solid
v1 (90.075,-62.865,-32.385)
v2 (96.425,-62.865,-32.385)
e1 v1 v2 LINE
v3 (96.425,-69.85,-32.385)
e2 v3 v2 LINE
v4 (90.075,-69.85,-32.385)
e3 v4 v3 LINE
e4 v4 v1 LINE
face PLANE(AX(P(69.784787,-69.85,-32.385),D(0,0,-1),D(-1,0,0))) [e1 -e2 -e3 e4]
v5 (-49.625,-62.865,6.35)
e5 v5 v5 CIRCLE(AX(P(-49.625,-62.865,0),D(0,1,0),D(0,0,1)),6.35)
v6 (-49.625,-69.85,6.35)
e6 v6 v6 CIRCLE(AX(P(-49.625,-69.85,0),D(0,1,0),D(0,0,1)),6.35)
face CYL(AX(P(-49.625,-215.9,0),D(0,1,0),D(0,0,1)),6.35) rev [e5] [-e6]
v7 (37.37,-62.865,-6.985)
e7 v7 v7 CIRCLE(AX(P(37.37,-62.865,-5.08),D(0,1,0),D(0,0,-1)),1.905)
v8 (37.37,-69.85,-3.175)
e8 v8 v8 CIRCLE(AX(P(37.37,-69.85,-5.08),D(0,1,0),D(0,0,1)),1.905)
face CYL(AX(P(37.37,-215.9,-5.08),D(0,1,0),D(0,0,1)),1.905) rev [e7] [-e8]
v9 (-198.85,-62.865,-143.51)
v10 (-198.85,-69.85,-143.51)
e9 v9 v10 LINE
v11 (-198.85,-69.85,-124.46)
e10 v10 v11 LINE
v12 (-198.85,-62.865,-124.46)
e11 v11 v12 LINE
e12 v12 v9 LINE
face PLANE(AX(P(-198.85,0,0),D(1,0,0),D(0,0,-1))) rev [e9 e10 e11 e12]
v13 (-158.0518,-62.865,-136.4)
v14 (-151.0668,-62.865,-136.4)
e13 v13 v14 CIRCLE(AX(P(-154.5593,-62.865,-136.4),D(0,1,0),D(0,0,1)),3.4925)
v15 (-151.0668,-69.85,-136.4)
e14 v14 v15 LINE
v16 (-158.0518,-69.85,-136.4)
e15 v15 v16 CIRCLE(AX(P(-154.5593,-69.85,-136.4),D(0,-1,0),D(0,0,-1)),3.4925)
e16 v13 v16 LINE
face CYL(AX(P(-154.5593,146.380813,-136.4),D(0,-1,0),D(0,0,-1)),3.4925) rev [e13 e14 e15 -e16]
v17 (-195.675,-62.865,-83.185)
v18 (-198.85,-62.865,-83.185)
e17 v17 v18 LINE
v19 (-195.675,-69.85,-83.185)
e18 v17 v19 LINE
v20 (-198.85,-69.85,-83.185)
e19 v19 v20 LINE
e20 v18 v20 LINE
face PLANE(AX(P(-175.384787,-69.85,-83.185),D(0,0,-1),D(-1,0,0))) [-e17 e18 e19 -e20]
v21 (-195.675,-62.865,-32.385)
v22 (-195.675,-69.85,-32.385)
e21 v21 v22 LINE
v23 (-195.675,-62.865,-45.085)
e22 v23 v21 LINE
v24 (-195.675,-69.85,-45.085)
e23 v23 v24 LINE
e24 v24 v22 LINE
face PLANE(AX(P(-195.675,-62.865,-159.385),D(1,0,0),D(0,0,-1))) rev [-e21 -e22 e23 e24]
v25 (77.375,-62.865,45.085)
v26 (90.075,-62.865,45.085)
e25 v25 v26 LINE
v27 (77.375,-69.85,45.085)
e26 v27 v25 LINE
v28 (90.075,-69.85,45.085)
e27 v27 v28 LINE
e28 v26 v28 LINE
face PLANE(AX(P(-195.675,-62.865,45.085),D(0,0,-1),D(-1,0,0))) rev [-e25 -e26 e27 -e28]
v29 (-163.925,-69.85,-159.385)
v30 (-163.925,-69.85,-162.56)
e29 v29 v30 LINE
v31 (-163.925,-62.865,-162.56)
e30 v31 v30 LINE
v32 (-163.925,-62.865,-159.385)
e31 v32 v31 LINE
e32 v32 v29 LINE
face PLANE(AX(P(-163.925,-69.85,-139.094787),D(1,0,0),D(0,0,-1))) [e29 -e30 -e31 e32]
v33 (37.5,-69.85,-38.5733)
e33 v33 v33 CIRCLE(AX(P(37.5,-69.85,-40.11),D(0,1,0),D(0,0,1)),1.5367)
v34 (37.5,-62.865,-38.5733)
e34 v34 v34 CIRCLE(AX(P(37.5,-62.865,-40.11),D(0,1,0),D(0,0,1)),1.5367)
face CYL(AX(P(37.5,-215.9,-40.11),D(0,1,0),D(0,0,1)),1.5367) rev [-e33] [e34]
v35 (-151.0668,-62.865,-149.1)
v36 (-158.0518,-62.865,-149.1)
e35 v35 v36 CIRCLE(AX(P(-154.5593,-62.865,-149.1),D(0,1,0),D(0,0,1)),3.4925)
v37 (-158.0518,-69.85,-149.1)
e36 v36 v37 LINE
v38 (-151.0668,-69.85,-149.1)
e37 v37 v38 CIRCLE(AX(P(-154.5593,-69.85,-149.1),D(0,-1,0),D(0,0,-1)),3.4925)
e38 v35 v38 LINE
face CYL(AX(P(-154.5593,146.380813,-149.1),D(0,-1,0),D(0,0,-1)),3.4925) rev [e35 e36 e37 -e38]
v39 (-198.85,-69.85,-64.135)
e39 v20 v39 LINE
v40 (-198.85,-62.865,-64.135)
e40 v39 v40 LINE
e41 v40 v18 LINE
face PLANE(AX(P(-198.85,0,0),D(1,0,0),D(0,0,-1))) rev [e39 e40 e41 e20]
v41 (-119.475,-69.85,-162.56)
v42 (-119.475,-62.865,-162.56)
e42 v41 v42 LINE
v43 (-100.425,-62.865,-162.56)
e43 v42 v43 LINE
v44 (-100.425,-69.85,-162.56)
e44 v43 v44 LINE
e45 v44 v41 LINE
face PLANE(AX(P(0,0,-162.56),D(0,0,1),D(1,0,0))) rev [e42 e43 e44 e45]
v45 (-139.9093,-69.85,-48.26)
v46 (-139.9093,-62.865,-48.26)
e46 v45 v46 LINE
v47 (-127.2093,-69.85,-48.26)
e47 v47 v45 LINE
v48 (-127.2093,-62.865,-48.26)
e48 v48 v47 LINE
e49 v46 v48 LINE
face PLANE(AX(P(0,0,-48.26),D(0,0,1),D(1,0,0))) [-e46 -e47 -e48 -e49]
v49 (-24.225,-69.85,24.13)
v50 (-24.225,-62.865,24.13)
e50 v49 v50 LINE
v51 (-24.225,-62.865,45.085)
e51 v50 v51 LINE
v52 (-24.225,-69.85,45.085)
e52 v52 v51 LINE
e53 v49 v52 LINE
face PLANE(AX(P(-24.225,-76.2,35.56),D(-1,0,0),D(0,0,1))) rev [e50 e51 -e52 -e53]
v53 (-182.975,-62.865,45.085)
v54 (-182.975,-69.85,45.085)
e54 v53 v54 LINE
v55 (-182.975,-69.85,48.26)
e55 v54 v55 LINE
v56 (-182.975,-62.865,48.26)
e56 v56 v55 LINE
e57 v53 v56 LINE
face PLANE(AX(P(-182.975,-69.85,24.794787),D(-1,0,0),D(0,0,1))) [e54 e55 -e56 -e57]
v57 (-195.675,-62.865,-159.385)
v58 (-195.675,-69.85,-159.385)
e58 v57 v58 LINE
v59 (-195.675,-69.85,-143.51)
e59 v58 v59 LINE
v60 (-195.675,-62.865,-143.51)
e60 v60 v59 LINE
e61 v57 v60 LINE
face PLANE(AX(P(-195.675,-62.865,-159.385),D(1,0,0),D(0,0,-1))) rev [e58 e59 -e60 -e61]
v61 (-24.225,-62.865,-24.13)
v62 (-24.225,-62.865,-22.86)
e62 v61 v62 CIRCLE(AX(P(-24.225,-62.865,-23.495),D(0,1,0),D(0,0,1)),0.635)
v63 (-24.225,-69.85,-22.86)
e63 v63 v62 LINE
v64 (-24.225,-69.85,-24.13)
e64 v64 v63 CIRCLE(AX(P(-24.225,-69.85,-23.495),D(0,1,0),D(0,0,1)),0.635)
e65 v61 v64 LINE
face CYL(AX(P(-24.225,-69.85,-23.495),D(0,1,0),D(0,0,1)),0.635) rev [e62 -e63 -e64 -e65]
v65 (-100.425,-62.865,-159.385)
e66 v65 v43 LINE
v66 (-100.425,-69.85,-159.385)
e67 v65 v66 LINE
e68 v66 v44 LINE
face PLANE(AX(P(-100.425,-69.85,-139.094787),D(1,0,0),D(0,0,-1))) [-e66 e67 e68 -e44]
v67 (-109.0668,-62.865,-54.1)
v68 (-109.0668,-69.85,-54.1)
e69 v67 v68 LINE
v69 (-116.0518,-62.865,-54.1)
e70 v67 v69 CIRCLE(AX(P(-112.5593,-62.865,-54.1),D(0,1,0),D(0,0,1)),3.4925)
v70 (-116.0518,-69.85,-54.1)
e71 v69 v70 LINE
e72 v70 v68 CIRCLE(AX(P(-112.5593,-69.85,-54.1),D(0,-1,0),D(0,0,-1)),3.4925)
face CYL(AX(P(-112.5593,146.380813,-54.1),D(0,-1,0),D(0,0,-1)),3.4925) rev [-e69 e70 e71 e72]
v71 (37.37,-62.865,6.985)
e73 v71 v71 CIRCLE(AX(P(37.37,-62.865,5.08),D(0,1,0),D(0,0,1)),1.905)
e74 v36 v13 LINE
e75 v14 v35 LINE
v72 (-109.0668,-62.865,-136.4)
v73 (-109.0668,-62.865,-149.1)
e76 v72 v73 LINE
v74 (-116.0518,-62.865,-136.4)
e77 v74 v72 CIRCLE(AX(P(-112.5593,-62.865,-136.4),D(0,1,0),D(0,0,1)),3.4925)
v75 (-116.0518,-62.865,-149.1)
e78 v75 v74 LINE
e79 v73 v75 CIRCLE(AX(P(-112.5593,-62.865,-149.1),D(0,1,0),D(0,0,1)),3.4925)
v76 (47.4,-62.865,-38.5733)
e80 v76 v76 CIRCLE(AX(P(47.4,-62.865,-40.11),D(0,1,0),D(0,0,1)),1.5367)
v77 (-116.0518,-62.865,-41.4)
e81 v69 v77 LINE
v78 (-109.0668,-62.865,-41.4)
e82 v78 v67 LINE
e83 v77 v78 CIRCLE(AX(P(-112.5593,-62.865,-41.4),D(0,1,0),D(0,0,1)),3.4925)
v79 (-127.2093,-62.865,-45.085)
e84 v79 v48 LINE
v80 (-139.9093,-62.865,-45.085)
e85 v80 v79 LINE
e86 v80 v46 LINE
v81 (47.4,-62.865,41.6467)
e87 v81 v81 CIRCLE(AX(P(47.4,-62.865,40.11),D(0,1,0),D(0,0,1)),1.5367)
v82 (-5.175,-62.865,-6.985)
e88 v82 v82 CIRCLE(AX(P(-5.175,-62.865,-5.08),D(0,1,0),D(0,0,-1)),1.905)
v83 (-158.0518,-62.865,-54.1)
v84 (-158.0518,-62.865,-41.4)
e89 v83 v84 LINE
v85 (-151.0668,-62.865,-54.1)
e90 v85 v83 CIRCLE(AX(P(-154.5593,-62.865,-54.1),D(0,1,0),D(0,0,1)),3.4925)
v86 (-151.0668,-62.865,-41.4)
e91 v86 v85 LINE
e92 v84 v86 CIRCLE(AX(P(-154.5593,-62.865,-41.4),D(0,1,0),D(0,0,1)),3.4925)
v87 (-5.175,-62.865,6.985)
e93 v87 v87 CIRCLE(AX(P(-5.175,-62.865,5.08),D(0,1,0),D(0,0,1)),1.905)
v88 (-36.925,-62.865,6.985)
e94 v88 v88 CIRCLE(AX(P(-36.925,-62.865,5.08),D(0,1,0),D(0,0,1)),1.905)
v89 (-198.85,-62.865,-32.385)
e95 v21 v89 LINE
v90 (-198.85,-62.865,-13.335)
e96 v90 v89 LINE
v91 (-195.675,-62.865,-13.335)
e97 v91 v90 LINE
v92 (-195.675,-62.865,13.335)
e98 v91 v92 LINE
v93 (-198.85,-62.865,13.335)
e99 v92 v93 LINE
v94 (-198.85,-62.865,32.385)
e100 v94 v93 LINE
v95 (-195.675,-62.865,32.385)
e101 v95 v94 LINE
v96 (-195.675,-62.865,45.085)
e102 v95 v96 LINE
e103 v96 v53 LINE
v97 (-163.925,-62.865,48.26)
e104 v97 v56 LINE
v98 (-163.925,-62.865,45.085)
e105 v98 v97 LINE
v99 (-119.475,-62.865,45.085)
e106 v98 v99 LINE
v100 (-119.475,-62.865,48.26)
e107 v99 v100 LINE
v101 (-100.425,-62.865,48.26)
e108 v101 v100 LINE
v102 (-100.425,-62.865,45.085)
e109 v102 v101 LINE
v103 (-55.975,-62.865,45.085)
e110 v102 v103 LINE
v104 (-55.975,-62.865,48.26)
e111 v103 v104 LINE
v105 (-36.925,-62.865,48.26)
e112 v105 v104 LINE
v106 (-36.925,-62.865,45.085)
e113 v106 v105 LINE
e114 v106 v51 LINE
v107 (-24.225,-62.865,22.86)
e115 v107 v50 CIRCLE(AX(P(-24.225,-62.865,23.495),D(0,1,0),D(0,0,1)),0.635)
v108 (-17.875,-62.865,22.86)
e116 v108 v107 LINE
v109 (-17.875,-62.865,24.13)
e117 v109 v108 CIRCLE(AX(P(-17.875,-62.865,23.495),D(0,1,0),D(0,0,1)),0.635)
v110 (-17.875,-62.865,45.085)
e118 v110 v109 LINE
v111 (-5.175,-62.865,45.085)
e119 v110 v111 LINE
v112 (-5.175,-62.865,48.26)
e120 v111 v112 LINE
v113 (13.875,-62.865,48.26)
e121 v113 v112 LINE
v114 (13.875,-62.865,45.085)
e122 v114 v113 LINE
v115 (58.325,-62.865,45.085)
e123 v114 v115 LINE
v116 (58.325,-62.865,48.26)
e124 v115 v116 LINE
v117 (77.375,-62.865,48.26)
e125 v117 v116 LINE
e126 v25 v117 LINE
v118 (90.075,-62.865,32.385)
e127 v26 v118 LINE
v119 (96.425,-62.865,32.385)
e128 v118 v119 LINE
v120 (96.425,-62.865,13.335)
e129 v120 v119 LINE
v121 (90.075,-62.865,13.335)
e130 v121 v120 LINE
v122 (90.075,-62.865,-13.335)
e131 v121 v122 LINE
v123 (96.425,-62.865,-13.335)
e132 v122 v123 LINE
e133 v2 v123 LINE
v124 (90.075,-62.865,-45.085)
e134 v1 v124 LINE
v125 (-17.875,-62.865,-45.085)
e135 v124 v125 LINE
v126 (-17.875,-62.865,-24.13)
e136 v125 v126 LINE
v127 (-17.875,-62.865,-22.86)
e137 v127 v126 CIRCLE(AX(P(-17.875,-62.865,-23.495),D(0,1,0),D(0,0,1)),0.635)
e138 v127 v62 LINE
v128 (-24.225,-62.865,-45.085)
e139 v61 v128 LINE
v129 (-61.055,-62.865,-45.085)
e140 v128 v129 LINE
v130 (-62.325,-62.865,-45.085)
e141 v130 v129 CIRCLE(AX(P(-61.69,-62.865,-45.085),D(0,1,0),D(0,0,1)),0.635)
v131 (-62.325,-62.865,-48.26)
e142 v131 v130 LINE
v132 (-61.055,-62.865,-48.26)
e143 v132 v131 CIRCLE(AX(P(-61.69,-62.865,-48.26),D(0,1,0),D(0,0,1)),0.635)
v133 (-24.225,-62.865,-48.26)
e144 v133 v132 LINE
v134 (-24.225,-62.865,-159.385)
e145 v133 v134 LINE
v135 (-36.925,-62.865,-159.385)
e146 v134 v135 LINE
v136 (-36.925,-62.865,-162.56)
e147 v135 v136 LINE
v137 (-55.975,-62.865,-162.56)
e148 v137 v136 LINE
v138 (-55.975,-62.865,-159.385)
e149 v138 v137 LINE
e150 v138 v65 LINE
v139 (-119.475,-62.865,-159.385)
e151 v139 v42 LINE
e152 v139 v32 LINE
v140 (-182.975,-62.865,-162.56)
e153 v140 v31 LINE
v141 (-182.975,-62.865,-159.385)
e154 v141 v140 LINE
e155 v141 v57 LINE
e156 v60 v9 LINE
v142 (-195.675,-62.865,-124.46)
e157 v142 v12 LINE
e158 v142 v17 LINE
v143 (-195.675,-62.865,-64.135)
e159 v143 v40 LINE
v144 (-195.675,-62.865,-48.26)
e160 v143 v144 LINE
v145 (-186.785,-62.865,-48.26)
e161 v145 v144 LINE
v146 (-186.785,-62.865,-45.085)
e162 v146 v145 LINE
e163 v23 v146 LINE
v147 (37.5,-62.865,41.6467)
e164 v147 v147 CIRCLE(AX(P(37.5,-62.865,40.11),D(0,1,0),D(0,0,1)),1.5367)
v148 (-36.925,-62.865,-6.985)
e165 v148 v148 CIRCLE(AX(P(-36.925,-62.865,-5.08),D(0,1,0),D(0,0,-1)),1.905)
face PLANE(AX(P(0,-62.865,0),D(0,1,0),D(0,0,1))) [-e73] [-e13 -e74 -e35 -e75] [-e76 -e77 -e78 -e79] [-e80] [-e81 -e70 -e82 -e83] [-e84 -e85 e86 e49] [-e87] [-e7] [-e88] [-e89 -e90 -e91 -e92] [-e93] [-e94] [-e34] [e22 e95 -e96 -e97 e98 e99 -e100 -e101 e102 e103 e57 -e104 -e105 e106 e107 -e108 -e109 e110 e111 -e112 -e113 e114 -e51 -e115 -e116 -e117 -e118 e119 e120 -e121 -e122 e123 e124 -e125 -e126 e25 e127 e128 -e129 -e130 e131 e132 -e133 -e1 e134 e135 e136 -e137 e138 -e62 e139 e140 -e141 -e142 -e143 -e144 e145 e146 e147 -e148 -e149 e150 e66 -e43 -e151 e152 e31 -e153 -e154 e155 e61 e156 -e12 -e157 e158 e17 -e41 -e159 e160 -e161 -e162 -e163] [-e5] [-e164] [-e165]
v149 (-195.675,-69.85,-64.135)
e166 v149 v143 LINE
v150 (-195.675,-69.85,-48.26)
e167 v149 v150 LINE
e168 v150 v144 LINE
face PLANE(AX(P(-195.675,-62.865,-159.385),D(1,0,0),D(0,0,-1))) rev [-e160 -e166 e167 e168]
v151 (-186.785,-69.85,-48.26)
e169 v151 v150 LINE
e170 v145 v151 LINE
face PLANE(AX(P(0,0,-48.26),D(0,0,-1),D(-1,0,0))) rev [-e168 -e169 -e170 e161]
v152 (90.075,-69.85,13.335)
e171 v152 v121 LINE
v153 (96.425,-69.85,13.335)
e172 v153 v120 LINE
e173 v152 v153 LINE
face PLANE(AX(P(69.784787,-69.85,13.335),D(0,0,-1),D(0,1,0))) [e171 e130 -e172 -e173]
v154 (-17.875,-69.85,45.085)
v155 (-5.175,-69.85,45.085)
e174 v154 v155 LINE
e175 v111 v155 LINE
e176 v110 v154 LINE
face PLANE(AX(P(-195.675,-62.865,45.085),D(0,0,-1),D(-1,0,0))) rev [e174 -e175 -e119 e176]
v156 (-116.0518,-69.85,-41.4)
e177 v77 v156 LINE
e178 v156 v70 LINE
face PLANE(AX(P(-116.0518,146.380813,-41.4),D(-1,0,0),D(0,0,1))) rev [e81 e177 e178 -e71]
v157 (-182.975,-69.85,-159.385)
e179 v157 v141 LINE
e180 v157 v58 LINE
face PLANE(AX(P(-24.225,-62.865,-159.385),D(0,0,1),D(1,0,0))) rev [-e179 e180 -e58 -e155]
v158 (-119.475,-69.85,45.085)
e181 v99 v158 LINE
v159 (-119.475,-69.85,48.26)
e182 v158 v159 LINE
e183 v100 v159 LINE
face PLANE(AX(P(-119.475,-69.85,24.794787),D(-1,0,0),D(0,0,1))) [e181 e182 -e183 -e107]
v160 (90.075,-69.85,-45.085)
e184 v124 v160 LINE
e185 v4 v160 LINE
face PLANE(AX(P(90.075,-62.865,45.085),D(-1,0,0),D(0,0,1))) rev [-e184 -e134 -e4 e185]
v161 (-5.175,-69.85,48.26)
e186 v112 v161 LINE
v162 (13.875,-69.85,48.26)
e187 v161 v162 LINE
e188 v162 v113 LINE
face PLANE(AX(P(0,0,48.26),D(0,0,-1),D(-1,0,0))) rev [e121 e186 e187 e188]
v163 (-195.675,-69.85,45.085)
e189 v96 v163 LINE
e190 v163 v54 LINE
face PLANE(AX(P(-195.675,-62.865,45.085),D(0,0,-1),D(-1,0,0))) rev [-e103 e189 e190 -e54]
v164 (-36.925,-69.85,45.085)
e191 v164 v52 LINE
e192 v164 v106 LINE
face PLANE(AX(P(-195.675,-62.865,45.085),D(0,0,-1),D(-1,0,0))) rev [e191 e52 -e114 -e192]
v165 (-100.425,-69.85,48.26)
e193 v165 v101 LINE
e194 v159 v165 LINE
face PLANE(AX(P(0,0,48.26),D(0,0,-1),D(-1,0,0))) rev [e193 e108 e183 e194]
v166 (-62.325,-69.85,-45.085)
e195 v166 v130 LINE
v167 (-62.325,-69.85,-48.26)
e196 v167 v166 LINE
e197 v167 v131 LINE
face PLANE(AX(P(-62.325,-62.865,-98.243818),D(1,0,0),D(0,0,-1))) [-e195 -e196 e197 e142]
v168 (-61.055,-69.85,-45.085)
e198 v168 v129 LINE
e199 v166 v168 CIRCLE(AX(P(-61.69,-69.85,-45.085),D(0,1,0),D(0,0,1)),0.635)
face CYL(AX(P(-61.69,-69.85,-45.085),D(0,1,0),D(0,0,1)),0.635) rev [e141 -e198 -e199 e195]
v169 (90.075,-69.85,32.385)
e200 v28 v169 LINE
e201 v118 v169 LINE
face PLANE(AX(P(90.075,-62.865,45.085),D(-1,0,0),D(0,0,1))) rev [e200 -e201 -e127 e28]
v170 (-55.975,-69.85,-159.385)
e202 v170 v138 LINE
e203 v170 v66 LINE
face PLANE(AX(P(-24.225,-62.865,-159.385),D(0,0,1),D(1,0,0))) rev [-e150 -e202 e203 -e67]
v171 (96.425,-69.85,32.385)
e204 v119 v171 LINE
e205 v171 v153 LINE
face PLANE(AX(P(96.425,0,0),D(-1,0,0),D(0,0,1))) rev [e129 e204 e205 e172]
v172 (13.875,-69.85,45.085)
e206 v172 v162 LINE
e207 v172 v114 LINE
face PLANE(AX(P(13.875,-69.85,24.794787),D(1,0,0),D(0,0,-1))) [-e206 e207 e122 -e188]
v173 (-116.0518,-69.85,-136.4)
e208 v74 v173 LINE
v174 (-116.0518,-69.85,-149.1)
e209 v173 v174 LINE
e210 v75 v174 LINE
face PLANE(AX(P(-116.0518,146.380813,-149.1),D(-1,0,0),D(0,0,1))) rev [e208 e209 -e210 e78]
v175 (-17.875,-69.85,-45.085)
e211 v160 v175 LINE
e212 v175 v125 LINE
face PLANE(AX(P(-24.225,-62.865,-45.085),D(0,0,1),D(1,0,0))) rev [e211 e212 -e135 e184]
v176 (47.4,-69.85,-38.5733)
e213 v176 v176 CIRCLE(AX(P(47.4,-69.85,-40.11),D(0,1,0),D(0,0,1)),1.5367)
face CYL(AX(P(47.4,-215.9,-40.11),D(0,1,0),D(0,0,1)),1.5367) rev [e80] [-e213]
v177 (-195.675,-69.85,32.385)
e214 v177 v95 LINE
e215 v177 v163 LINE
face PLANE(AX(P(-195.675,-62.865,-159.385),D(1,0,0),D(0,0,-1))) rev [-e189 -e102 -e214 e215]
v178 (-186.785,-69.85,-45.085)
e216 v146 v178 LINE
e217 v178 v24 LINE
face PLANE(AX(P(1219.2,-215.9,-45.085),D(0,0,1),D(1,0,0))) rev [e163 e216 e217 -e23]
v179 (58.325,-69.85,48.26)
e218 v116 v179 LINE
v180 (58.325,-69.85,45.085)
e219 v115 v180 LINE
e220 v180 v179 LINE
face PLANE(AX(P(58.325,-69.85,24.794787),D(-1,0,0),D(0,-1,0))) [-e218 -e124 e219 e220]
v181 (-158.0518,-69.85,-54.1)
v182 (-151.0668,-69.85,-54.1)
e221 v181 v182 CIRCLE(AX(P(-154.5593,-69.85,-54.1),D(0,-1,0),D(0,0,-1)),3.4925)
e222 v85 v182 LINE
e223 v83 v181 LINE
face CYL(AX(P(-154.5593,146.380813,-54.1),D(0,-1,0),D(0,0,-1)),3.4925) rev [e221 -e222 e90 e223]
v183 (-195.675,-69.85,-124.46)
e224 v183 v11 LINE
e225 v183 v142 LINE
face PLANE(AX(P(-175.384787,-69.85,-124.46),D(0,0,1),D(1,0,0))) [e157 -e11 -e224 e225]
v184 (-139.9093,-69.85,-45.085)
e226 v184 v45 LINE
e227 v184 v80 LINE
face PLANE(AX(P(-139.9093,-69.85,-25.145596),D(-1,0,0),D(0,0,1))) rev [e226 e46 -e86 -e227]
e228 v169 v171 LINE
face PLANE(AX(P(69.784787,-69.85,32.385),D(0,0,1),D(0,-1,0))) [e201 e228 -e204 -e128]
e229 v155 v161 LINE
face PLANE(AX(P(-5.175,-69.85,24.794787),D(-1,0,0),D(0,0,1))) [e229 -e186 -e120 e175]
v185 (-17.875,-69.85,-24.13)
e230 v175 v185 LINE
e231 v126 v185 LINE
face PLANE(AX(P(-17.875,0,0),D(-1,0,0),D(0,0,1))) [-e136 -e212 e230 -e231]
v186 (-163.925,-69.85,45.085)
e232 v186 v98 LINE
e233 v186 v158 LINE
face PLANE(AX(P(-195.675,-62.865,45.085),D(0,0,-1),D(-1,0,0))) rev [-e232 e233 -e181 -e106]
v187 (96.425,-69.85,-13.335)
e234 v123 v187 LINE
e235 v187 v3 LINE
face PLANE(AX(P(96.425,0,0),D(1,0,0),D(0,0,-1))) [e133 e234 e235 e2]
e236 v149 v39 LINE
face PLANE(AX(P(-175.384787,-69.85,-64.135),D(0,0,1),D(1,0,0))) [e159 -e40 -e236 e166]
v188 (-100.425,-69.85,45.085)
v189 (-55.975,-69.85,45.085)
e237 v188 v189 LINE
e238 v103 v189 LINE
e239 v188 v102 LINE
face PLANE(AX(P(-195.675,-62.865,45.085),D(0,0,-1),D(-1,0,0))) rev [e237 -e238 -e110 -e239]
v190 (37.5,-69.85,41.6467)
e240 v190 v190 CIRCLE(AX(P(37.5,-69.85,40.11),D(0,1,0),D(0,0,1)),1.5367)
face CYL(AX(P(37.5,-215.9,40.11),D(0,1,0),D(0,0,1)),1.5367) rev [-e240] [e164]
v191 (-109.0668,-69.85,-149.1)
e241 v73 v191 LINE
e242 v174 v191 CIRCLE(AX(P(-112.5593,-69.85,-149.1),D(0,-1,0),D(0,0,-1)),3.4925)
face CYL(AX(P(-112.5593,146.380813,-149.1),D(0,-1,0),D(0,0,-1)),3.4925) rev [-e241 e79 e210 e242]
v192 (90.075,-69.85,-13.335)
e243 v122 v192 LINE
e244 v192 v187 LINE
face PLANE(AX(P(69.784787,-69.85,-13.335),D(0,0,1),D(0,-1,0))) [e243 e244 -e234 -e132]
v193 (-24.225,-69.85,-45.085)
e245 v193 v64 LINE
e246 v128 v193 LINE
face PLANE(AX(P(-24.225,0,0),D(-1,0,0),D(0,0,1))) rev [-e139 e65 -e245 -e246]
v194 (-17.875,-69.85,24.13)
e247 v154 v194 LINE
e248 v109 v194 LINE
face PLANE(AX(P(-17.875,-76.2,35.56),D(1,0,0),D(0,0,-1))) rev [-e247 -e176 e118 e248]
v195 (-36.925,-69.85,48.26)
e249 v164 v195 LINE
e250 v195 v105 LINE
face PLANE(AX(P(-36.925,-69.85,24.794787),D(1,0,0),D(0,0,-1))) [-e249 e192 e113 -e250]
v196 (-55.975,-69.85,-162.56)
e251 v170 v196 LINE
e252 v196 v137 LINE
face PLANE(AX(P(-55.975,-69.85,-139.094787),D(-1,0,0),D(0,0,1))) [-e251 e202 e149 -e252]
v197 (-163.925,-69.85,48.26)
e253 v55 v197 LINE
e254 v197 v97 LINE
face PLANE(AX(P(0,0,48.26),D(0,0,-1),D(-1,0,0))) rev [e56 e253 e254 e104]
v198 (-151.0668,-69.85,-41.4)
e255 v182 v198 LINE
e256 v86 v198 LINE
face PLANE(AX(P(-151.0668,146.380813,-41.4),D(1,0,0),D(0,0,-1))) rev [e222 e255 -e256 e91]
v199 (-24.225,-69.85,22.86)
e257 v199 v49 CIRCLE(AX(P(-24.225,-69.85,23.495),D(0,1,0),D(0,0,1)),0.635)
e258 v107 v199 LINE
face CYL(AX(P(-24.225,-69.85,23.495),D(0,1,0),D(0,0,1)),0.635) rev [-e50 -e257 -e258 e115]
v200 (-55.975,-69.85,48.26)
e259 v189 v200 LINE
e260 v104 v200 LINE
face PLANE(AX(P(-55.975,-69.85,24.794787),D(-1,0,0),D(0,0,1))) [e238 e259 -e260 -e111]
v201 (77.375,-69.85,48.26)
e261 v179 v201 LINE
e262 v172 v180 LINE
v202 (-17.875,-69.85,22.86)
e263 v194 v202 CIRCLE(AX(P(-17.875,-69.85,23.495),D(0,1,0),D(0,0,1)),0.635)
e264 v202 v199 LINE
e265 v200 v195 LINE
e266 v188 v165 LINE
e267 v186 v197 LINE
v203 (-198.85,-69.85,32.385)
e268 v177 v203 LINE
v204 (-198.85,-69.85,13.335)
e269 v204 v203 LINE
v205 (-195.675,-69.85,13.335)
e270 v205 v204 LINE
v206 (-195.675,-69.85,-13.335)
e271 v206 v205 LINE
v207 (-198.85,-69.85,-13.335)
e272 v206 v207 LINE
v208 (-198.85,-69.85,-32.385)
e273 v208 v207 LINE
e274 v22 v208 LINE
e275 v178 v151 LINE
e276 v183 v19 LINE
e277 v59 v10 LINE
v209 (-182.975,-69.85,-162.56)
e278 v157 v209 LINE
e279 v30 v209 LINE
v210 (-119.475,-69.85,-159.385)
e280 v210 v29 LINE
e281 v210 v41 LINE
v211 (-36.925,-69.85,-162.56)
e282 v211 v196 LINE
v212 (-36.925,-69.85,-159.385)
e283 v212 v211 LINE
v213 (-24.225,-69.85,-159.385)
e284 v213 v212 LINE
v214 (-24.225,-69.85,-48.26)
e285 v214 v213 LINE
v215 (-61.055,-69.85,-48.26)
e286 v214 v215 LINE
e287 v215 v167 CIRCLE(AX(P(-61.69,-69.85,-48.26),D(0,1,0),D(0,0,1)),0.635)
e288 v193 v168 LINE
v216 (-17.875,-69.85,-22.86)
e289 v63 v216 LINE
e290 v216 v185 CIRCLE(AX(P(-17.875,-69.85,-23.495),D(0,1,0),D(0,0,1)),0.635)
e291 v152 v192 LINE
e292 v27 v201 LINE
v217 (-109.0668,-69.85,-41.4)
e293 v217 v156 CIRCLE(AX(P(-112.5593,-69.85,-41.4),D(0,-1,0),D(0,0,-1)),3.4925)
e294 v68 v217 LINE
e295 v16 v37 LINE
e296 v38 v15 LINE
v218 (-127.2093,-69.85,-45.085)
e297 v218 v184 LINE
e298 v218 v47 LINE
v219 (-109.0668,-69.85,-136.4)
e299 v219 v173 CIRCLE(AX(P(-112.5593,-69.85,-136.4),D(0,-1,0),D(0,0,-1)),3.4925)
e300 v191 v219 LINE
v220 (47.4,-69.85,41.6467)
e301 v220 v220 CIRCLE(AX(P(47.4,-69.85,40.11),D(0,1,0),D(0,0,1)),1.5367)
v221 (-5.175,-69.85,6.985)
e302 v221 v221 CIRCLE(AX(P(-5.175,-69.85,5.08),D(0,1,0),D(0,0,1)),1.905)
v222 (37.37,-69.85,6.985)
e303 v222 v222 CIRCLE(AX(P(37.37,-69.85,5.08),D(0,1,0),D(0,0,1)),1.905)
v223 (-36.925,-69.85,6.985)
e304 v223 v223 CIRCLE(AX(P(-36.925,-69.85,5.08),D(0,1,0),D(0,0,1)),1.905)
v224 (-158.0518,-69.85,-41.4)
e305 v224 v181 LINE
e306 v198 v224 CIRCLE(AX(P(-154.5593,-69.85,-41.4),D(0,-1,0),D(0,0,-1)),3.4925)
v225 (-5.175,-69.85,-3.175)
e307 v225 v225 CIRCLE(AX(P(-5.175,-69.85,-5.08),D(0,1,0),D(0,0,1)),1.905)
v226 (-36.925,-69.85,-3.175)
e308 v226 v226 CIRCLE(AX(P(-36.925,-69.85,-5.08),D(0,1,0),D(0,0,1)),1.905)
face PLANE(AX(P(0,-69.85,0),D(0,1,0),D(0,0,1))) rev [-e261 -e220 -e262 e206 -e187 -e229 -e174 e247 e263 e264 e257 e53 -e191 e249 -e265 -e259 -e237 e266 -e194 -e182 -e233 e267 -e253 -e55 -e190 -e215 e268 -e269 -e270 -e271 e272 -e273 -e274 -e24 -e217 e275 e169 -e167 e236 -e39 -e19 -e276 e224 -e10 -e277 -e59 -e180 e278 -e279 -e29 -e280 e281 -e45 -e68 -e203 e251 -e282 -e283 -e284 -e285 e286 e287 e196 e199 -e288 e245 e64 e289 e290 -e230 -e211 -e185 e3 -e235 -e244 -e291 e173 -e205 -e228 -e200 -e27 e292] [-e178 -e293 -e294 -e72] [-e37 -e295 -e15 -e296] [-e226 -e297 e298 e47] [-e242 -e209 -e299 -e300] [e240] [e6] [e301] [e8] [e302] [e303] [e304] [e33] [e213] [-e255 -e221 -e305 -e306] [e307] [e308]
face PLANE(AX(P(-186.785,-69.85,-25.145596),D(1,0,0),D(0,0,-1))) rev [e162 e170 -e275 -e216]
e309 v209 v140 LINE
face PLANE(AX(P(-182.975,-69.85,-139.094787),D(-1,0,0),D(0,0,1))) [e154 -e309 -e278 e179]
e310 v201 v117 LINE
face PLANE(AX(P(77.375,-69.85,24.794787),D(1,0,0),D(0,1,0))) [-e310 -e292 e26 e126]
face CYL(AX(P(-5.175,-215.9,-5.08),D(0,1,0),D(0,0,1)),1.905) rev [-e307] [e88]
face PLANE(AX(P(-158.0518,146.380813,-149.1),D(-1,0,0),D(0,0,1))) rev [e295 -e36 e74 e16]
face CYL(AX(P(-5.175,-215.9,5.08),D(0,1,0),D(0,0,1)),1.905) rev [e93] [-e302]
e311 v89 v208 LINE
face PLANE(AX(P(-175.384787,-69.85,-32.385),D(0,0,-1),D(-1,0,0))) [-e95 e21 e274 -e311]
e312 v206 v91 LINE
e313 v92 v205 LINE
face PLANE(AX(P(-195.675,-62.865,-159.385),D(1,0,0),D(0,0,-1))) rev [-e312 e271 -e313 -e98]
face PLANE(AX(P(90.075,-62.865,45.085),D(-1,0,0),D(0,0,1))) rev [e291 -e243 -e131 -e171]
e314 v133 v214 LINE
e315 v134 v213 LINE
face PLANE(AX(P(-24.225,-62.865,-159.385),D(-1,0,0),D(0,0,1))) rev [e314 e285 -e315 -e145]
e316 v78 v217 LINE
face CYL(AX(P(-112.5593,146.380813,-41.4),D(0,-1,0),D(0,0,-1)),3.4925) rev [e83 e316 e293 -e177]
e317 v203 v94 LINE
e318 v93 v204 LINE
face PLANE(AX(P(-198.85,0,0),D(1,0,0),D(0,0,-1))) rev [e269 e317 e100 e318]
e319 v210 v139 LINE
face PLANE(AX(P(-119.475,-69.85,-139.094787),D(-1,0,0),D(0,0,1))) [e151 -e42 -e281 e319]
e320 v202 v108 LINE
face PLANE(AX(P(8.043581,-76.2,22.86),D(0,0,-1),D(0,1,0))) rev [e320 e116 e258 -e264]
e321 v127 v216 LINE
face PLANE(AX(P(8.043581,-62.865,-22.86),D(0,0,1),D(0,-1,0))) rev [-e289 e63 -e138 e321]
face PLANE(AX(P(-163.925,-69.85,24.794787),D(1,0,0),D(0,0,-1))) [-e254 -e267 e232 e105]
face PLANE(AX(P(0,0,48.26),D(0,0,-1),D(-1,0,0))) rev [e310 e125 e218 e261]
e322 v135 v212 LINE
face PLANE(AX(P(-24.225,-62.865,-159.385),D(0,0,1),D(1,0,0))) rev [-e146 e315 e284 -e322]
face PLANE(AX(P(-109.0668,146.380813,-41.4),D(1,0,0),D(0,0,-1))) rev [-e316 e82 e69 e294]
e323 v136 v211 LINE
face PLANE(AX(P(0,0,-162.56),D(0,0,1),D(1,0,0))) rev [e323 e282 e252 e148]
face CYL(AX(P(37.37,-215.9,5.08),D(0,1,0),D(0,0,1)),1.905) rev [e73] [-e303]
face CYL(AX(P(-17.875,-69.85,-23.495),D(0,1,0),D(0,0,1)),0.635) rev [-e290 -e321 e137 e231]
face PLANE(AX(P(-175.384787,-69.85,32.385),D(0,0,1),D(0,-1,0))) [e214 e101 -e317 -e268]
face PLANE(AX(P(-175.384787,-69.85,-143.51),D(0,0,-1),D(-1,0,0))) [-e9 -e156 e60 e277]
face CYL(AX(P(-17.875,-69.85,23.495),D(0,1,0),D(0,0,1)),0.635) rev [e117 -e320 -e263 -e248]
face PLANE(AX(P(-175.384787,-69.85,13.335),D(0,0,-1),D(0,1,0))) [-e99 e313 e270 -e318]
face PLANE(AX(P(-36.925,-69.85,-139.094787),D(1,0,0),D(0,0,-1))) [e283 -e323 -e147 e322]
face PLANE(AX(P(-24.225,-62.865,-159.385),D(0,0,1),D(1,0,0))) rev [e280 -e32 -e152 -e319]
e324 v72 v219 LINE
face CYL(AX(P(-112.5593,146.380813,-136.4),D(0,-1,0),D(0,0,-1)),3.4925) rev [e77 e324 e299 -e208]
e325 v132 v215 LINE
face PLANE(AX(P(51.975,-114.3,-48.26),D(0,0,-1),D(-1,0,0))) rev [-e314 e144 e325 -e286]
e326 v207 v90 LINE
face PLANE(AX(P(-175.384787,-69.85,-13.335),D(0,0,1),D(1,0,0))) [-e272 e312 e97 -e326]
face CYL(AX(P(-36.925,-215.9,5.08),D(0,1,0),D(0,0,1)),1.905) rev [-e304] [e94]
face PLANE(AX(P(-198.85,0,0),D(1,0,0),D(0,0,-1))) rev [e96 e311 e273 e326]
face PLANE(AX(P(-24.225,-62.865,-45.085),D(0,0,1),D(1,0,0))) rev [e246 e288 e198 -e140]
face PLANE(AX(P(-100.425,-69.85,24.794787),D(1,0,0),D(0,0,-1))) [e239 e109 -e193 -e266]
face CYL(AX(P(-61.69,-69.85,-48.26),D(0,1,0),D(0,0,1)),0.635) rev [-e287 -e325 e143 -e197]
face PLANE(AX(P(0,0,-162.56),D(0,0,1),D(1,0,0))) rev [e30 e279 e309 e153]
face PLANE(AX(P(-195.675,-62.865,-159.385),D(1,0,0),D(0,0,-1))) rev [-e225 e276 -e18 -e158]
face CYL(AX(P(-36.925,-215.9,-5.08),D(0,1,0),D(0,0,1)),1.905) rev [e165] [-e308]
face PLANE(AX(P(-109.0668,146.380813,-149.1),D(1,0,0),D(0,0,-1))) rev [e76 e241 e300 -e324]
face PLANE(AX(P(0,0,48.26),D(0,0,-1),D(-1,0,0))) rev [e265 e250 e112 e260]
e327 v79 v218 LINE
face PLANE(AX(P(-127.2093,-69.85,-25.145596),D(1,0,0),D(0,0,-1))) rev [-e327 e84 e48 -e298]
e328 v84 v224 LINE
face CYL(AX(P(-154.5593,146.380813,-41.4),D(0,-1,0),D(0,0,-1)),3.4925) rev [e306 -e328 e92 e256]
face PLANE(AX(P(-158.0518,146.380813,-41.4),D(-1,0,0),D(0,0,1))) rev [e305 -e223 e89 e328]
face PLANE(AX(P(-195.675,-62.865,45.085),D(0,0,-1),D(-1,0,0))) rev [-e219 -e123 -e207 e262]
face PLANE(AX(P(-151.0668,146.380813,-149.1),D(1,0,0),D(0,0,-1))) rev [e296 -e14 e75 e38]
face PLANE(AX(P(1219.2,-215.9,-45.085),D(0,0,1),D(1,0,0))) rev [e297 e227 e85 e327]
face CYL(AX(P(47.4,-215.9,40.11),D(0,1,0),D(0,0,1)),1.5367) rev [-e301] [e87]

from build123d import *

# Parameters (mm, degrees)
BODY_DELETE_KEEP_START         = -69.85
BODY_DELETE_KEEP_1_OUTLINE_W   = 12.7
BODY_DELETE_KEEP_1_OUTLINE_H   = 3.175
BODY_DELETE_KEEP_1_OUTLINE_R   = 1.905
BODY_DELETE_KEEP_1_OUTLINE_R_2 = 6.35
BODY_DELETE_KEEP_1_OUTLINE_R_3 = 1.5367
BODY_DELETE_KEEP_1_DEPTH       = 6.985
SKETCH1_R                      = 0.635
CUT_EXTRUDE1_DEPTH             = 257.935529511


# Read off the part's stored shape, not the designer's step: Body-Delete/Keep 1
with BuildPart() as part:
    # Body-Delete/Keep 1 outline → Body-Delete/Keep 1 (new body)
    with BuildSketch(Plane(origin=(0, 0, 0), x_dir=(1, 0, 0), z_dir=(0, 1, 0)).offset(BODY_DELETE_KEEP_START)):
        Polygon((90.075, -13.335), (90.075, 13.335), (96.425, 13.335), (96.425, 32.385), (90.075, 32.385), (90.075, 45.085), (-17.875, 45.085), (-17.875, 22.86), (-24.225, 22.86), (-24.225, 45.085), (-62.325, 45.085), (-62.325, 48.26), (-24.225, 48.26), (-24.225, 159.385), (-36.925, 159.385), (-36.925, 162.56), (-55.975, 162.56), (-55.975, 159.385), (-100.425, 159.385), (-100.425, 162.56), (-119.475, 162.56), (-119.475, 159.385), (-163.925, 159.385), (-163.925, 162.56), (-182.975, 162.56), (-182.975, 159.385), (-195.675, 159.385), (-195.675, 143.51), (-198.85, 143.51), (-198.85, 124.46), (-195.675, 124.46), (-195.675, 83.185), (-198.85, 83.185), (-198.85, 64.135), (-195.675, 64.135), (-195.675, 48.26), (-186.785, 48.26), (-186.785, 45.085), (-195.675, 45.085), (-195.675, 32.385), (-198.85, 32.385), (-198.85, 13.335), (-195.675, 13.335), (-195.675, -13.335), (-198.85, -13.335), (-198.85, -32.385), (-195.675, -32.385), (-195.675, -45.085), (-182.975, -45.085), (-182.975, -48.26), (-163.925, -48.26), (-163.925, -45.085), (-119.475, -45.085), (-119.475, -48.26), (-100.425, -48.26), (-100.425, -45.085), (-55.975, -45.085), (-55.975, -48.26), (-36.925, -48.26), (-36.925, -45.085), (-24.225, -45.085), (-24.225, -22.86), (-17.875, -22.86), (-17.875, -45.085), (-5.175, -45.085), (-5.175, -48.26), (13.875, -48.26), (13.875, -45.085), (58.325, -45.085), (58.325, -48.26), (77.375, -48.26), (77.375, -45.085), (90.075, -45.085), (90.075, -32.385), (96.425, -32.385), (96.425, -13.335), align=None)
        with BuildLine():
            Line((-151.0668, 54.1), (-151.0668, 41.4))
            ThreePointArc((-151.0668, 41.4), (-154.5593, 37.9075), (-158.0518, 41.4))
            Line((-158.0518, 41.4), (-158.0518, 54.1))
            ThreePointArc((-158.0518, 54.1), (-154.5593, 57.5925), (-151.0668, 54.1))
        make_face(mode=Mode.SUBTRACT)
        with Locations((-133.5593, 46.6725)):
            Rectangle(BODY_DELETE_KEEP_1_OUTLINE_W, BODY_DELETE_KEEP_1_OUTLINE_H, mode=Mode.SUBTRACT)
        with BuildLine():
            Line((-109.0668, 54.1), (-109.0668, 41.4))
            ThreePointArc((-109.0668, 41.4), (-112.5593, 37.9075), (-116.0518, 41.4))
            Line((-116.0518, 41.4), (-116.0518, 54.1))
            ThreePointArc((-116.0518, 54.1), (-112.5593, 57.5925), (-109.0668, 54.1))
        make_face(mode=Mode.SUBTRACT)
        with Locations((-36.925, -5.08)):
            Circle(BODY_DELETE_KEEP_1_OUTLINE_R, mode=Mode.SUBTRACT)
        with Locations((-49.625, 0)):
            Circle(BODY_DELETE_KEEP_1_OUTLINE_R_2, mode=Mode.SUBTRACT)
        with Locations((-5.175, -5.08)):
            Circle(BODY_DELETE_KEEP_1_OUTLINE_R, mode=Mode.SUBTRACT)
        with Locations((37.5, -40.11)):
            Circle(BODY_DELETE_KEEP_1_OUTLINE_R_3, mode=Mode.SUBTRACT)
        with Locations((47.4, -40.11)):
            Circle(BODY_DELETE_KEEP_1_OUTLINE_R_3, mode=Mode.SUBTRACT)
        with Locations((37.37, -5.08)):
            Circle(BODY_DELETE_KEEP_1_OUTLINE_R, mode=Mode.SUBTRACT)
        with Locations((-36.925, 5.08)):
            Circle(BODY_DELETE_KEEP_1_OUTLINE_R, mode=Mode.SUBTRACT)
        with Locations((-5.175, 5.08)):
            Circle(BODY_DELETE_KEEP_1_OUTLINE_R, mode=Mode.SUBTRACT)
        with Locations((37.37, 5.08)):
            Circle(BODY_DELETE_KEEP_1_OUTLINE_R, mode=Mode.SUBTRACT)
        with Locations((37.5, 40.11)):
            Circle(BODY_DELETE_KEEP_1_OUTLINE_R_3, mode=Mode.SUBTRACT)
        with Locations((47.4, 40.11)):
            Circle(BODY_DELETE_KEEP_1_OUTLINE_R_3, mode=Mode.SUBTRACT)
        with BuildLine():
            Line((-158.0518, 136.4), (-158.0518, 149.1))
            ThreePointArc((-158.0518, 149.1), (-154.5593, 152.5925), (-151.0668, 149.1))
            Line((-151.0668, 149.1), (-151.0668, 136.4))
            ThreePointArc((-151.0668, 136.4), (-154.5593, 132.9075), (-158.0518, 136.4))
        make_face(mode=Mode.SUBTRACT)
        with BuildLine():
            Line((-116.0518, 136.4), (-116.0518, 149.1))
            ThreePointArc((-116.0518, 149.1), (-112.5593, 152.5925), (-109.0668, 149.1))
            Line((-109.0668, 149.1), (-109.0668, 136.4))
            ThreePointArc((-109.0668, 136.4), (-112.5593, 132.9075), (-116.0518, 136.4))
        make_face(mode=Mode.SUBTRACT)
    extrude(amount=BODY_DELETE_KEEP_1_DEPTH)

    # Sketch1 → Cut-Extrude1 (cut, through all)
    with BuildSketch(Plane(origin=(0, -62.865, 0), x_dir=(1, 0, 0), z_dir=(0, 1, 0))):
        with Locations((-61.69, 48.26)):
            Circle(SKETCH1_R)
        with Locations((-61.69, 45.085)):
            Circle(SKETCH1_R)
        with Locations((-17.875, 23.495)):
            Circle(SKETCH1_R)
        with Locations((-24.225, 23.495)):
            Circle(SKETCH1_R)
        with Locations((-17.875, -23.495)):
            Circle(SKETCH1_R)
        with Locations((-24.225, -23.495)):
            Circle(SKETCH1_R)
    extrude(amount=-CUT_EXTRUDE1_DEPTH, mode=Mode.SUBTRACT)


solid = part.part
